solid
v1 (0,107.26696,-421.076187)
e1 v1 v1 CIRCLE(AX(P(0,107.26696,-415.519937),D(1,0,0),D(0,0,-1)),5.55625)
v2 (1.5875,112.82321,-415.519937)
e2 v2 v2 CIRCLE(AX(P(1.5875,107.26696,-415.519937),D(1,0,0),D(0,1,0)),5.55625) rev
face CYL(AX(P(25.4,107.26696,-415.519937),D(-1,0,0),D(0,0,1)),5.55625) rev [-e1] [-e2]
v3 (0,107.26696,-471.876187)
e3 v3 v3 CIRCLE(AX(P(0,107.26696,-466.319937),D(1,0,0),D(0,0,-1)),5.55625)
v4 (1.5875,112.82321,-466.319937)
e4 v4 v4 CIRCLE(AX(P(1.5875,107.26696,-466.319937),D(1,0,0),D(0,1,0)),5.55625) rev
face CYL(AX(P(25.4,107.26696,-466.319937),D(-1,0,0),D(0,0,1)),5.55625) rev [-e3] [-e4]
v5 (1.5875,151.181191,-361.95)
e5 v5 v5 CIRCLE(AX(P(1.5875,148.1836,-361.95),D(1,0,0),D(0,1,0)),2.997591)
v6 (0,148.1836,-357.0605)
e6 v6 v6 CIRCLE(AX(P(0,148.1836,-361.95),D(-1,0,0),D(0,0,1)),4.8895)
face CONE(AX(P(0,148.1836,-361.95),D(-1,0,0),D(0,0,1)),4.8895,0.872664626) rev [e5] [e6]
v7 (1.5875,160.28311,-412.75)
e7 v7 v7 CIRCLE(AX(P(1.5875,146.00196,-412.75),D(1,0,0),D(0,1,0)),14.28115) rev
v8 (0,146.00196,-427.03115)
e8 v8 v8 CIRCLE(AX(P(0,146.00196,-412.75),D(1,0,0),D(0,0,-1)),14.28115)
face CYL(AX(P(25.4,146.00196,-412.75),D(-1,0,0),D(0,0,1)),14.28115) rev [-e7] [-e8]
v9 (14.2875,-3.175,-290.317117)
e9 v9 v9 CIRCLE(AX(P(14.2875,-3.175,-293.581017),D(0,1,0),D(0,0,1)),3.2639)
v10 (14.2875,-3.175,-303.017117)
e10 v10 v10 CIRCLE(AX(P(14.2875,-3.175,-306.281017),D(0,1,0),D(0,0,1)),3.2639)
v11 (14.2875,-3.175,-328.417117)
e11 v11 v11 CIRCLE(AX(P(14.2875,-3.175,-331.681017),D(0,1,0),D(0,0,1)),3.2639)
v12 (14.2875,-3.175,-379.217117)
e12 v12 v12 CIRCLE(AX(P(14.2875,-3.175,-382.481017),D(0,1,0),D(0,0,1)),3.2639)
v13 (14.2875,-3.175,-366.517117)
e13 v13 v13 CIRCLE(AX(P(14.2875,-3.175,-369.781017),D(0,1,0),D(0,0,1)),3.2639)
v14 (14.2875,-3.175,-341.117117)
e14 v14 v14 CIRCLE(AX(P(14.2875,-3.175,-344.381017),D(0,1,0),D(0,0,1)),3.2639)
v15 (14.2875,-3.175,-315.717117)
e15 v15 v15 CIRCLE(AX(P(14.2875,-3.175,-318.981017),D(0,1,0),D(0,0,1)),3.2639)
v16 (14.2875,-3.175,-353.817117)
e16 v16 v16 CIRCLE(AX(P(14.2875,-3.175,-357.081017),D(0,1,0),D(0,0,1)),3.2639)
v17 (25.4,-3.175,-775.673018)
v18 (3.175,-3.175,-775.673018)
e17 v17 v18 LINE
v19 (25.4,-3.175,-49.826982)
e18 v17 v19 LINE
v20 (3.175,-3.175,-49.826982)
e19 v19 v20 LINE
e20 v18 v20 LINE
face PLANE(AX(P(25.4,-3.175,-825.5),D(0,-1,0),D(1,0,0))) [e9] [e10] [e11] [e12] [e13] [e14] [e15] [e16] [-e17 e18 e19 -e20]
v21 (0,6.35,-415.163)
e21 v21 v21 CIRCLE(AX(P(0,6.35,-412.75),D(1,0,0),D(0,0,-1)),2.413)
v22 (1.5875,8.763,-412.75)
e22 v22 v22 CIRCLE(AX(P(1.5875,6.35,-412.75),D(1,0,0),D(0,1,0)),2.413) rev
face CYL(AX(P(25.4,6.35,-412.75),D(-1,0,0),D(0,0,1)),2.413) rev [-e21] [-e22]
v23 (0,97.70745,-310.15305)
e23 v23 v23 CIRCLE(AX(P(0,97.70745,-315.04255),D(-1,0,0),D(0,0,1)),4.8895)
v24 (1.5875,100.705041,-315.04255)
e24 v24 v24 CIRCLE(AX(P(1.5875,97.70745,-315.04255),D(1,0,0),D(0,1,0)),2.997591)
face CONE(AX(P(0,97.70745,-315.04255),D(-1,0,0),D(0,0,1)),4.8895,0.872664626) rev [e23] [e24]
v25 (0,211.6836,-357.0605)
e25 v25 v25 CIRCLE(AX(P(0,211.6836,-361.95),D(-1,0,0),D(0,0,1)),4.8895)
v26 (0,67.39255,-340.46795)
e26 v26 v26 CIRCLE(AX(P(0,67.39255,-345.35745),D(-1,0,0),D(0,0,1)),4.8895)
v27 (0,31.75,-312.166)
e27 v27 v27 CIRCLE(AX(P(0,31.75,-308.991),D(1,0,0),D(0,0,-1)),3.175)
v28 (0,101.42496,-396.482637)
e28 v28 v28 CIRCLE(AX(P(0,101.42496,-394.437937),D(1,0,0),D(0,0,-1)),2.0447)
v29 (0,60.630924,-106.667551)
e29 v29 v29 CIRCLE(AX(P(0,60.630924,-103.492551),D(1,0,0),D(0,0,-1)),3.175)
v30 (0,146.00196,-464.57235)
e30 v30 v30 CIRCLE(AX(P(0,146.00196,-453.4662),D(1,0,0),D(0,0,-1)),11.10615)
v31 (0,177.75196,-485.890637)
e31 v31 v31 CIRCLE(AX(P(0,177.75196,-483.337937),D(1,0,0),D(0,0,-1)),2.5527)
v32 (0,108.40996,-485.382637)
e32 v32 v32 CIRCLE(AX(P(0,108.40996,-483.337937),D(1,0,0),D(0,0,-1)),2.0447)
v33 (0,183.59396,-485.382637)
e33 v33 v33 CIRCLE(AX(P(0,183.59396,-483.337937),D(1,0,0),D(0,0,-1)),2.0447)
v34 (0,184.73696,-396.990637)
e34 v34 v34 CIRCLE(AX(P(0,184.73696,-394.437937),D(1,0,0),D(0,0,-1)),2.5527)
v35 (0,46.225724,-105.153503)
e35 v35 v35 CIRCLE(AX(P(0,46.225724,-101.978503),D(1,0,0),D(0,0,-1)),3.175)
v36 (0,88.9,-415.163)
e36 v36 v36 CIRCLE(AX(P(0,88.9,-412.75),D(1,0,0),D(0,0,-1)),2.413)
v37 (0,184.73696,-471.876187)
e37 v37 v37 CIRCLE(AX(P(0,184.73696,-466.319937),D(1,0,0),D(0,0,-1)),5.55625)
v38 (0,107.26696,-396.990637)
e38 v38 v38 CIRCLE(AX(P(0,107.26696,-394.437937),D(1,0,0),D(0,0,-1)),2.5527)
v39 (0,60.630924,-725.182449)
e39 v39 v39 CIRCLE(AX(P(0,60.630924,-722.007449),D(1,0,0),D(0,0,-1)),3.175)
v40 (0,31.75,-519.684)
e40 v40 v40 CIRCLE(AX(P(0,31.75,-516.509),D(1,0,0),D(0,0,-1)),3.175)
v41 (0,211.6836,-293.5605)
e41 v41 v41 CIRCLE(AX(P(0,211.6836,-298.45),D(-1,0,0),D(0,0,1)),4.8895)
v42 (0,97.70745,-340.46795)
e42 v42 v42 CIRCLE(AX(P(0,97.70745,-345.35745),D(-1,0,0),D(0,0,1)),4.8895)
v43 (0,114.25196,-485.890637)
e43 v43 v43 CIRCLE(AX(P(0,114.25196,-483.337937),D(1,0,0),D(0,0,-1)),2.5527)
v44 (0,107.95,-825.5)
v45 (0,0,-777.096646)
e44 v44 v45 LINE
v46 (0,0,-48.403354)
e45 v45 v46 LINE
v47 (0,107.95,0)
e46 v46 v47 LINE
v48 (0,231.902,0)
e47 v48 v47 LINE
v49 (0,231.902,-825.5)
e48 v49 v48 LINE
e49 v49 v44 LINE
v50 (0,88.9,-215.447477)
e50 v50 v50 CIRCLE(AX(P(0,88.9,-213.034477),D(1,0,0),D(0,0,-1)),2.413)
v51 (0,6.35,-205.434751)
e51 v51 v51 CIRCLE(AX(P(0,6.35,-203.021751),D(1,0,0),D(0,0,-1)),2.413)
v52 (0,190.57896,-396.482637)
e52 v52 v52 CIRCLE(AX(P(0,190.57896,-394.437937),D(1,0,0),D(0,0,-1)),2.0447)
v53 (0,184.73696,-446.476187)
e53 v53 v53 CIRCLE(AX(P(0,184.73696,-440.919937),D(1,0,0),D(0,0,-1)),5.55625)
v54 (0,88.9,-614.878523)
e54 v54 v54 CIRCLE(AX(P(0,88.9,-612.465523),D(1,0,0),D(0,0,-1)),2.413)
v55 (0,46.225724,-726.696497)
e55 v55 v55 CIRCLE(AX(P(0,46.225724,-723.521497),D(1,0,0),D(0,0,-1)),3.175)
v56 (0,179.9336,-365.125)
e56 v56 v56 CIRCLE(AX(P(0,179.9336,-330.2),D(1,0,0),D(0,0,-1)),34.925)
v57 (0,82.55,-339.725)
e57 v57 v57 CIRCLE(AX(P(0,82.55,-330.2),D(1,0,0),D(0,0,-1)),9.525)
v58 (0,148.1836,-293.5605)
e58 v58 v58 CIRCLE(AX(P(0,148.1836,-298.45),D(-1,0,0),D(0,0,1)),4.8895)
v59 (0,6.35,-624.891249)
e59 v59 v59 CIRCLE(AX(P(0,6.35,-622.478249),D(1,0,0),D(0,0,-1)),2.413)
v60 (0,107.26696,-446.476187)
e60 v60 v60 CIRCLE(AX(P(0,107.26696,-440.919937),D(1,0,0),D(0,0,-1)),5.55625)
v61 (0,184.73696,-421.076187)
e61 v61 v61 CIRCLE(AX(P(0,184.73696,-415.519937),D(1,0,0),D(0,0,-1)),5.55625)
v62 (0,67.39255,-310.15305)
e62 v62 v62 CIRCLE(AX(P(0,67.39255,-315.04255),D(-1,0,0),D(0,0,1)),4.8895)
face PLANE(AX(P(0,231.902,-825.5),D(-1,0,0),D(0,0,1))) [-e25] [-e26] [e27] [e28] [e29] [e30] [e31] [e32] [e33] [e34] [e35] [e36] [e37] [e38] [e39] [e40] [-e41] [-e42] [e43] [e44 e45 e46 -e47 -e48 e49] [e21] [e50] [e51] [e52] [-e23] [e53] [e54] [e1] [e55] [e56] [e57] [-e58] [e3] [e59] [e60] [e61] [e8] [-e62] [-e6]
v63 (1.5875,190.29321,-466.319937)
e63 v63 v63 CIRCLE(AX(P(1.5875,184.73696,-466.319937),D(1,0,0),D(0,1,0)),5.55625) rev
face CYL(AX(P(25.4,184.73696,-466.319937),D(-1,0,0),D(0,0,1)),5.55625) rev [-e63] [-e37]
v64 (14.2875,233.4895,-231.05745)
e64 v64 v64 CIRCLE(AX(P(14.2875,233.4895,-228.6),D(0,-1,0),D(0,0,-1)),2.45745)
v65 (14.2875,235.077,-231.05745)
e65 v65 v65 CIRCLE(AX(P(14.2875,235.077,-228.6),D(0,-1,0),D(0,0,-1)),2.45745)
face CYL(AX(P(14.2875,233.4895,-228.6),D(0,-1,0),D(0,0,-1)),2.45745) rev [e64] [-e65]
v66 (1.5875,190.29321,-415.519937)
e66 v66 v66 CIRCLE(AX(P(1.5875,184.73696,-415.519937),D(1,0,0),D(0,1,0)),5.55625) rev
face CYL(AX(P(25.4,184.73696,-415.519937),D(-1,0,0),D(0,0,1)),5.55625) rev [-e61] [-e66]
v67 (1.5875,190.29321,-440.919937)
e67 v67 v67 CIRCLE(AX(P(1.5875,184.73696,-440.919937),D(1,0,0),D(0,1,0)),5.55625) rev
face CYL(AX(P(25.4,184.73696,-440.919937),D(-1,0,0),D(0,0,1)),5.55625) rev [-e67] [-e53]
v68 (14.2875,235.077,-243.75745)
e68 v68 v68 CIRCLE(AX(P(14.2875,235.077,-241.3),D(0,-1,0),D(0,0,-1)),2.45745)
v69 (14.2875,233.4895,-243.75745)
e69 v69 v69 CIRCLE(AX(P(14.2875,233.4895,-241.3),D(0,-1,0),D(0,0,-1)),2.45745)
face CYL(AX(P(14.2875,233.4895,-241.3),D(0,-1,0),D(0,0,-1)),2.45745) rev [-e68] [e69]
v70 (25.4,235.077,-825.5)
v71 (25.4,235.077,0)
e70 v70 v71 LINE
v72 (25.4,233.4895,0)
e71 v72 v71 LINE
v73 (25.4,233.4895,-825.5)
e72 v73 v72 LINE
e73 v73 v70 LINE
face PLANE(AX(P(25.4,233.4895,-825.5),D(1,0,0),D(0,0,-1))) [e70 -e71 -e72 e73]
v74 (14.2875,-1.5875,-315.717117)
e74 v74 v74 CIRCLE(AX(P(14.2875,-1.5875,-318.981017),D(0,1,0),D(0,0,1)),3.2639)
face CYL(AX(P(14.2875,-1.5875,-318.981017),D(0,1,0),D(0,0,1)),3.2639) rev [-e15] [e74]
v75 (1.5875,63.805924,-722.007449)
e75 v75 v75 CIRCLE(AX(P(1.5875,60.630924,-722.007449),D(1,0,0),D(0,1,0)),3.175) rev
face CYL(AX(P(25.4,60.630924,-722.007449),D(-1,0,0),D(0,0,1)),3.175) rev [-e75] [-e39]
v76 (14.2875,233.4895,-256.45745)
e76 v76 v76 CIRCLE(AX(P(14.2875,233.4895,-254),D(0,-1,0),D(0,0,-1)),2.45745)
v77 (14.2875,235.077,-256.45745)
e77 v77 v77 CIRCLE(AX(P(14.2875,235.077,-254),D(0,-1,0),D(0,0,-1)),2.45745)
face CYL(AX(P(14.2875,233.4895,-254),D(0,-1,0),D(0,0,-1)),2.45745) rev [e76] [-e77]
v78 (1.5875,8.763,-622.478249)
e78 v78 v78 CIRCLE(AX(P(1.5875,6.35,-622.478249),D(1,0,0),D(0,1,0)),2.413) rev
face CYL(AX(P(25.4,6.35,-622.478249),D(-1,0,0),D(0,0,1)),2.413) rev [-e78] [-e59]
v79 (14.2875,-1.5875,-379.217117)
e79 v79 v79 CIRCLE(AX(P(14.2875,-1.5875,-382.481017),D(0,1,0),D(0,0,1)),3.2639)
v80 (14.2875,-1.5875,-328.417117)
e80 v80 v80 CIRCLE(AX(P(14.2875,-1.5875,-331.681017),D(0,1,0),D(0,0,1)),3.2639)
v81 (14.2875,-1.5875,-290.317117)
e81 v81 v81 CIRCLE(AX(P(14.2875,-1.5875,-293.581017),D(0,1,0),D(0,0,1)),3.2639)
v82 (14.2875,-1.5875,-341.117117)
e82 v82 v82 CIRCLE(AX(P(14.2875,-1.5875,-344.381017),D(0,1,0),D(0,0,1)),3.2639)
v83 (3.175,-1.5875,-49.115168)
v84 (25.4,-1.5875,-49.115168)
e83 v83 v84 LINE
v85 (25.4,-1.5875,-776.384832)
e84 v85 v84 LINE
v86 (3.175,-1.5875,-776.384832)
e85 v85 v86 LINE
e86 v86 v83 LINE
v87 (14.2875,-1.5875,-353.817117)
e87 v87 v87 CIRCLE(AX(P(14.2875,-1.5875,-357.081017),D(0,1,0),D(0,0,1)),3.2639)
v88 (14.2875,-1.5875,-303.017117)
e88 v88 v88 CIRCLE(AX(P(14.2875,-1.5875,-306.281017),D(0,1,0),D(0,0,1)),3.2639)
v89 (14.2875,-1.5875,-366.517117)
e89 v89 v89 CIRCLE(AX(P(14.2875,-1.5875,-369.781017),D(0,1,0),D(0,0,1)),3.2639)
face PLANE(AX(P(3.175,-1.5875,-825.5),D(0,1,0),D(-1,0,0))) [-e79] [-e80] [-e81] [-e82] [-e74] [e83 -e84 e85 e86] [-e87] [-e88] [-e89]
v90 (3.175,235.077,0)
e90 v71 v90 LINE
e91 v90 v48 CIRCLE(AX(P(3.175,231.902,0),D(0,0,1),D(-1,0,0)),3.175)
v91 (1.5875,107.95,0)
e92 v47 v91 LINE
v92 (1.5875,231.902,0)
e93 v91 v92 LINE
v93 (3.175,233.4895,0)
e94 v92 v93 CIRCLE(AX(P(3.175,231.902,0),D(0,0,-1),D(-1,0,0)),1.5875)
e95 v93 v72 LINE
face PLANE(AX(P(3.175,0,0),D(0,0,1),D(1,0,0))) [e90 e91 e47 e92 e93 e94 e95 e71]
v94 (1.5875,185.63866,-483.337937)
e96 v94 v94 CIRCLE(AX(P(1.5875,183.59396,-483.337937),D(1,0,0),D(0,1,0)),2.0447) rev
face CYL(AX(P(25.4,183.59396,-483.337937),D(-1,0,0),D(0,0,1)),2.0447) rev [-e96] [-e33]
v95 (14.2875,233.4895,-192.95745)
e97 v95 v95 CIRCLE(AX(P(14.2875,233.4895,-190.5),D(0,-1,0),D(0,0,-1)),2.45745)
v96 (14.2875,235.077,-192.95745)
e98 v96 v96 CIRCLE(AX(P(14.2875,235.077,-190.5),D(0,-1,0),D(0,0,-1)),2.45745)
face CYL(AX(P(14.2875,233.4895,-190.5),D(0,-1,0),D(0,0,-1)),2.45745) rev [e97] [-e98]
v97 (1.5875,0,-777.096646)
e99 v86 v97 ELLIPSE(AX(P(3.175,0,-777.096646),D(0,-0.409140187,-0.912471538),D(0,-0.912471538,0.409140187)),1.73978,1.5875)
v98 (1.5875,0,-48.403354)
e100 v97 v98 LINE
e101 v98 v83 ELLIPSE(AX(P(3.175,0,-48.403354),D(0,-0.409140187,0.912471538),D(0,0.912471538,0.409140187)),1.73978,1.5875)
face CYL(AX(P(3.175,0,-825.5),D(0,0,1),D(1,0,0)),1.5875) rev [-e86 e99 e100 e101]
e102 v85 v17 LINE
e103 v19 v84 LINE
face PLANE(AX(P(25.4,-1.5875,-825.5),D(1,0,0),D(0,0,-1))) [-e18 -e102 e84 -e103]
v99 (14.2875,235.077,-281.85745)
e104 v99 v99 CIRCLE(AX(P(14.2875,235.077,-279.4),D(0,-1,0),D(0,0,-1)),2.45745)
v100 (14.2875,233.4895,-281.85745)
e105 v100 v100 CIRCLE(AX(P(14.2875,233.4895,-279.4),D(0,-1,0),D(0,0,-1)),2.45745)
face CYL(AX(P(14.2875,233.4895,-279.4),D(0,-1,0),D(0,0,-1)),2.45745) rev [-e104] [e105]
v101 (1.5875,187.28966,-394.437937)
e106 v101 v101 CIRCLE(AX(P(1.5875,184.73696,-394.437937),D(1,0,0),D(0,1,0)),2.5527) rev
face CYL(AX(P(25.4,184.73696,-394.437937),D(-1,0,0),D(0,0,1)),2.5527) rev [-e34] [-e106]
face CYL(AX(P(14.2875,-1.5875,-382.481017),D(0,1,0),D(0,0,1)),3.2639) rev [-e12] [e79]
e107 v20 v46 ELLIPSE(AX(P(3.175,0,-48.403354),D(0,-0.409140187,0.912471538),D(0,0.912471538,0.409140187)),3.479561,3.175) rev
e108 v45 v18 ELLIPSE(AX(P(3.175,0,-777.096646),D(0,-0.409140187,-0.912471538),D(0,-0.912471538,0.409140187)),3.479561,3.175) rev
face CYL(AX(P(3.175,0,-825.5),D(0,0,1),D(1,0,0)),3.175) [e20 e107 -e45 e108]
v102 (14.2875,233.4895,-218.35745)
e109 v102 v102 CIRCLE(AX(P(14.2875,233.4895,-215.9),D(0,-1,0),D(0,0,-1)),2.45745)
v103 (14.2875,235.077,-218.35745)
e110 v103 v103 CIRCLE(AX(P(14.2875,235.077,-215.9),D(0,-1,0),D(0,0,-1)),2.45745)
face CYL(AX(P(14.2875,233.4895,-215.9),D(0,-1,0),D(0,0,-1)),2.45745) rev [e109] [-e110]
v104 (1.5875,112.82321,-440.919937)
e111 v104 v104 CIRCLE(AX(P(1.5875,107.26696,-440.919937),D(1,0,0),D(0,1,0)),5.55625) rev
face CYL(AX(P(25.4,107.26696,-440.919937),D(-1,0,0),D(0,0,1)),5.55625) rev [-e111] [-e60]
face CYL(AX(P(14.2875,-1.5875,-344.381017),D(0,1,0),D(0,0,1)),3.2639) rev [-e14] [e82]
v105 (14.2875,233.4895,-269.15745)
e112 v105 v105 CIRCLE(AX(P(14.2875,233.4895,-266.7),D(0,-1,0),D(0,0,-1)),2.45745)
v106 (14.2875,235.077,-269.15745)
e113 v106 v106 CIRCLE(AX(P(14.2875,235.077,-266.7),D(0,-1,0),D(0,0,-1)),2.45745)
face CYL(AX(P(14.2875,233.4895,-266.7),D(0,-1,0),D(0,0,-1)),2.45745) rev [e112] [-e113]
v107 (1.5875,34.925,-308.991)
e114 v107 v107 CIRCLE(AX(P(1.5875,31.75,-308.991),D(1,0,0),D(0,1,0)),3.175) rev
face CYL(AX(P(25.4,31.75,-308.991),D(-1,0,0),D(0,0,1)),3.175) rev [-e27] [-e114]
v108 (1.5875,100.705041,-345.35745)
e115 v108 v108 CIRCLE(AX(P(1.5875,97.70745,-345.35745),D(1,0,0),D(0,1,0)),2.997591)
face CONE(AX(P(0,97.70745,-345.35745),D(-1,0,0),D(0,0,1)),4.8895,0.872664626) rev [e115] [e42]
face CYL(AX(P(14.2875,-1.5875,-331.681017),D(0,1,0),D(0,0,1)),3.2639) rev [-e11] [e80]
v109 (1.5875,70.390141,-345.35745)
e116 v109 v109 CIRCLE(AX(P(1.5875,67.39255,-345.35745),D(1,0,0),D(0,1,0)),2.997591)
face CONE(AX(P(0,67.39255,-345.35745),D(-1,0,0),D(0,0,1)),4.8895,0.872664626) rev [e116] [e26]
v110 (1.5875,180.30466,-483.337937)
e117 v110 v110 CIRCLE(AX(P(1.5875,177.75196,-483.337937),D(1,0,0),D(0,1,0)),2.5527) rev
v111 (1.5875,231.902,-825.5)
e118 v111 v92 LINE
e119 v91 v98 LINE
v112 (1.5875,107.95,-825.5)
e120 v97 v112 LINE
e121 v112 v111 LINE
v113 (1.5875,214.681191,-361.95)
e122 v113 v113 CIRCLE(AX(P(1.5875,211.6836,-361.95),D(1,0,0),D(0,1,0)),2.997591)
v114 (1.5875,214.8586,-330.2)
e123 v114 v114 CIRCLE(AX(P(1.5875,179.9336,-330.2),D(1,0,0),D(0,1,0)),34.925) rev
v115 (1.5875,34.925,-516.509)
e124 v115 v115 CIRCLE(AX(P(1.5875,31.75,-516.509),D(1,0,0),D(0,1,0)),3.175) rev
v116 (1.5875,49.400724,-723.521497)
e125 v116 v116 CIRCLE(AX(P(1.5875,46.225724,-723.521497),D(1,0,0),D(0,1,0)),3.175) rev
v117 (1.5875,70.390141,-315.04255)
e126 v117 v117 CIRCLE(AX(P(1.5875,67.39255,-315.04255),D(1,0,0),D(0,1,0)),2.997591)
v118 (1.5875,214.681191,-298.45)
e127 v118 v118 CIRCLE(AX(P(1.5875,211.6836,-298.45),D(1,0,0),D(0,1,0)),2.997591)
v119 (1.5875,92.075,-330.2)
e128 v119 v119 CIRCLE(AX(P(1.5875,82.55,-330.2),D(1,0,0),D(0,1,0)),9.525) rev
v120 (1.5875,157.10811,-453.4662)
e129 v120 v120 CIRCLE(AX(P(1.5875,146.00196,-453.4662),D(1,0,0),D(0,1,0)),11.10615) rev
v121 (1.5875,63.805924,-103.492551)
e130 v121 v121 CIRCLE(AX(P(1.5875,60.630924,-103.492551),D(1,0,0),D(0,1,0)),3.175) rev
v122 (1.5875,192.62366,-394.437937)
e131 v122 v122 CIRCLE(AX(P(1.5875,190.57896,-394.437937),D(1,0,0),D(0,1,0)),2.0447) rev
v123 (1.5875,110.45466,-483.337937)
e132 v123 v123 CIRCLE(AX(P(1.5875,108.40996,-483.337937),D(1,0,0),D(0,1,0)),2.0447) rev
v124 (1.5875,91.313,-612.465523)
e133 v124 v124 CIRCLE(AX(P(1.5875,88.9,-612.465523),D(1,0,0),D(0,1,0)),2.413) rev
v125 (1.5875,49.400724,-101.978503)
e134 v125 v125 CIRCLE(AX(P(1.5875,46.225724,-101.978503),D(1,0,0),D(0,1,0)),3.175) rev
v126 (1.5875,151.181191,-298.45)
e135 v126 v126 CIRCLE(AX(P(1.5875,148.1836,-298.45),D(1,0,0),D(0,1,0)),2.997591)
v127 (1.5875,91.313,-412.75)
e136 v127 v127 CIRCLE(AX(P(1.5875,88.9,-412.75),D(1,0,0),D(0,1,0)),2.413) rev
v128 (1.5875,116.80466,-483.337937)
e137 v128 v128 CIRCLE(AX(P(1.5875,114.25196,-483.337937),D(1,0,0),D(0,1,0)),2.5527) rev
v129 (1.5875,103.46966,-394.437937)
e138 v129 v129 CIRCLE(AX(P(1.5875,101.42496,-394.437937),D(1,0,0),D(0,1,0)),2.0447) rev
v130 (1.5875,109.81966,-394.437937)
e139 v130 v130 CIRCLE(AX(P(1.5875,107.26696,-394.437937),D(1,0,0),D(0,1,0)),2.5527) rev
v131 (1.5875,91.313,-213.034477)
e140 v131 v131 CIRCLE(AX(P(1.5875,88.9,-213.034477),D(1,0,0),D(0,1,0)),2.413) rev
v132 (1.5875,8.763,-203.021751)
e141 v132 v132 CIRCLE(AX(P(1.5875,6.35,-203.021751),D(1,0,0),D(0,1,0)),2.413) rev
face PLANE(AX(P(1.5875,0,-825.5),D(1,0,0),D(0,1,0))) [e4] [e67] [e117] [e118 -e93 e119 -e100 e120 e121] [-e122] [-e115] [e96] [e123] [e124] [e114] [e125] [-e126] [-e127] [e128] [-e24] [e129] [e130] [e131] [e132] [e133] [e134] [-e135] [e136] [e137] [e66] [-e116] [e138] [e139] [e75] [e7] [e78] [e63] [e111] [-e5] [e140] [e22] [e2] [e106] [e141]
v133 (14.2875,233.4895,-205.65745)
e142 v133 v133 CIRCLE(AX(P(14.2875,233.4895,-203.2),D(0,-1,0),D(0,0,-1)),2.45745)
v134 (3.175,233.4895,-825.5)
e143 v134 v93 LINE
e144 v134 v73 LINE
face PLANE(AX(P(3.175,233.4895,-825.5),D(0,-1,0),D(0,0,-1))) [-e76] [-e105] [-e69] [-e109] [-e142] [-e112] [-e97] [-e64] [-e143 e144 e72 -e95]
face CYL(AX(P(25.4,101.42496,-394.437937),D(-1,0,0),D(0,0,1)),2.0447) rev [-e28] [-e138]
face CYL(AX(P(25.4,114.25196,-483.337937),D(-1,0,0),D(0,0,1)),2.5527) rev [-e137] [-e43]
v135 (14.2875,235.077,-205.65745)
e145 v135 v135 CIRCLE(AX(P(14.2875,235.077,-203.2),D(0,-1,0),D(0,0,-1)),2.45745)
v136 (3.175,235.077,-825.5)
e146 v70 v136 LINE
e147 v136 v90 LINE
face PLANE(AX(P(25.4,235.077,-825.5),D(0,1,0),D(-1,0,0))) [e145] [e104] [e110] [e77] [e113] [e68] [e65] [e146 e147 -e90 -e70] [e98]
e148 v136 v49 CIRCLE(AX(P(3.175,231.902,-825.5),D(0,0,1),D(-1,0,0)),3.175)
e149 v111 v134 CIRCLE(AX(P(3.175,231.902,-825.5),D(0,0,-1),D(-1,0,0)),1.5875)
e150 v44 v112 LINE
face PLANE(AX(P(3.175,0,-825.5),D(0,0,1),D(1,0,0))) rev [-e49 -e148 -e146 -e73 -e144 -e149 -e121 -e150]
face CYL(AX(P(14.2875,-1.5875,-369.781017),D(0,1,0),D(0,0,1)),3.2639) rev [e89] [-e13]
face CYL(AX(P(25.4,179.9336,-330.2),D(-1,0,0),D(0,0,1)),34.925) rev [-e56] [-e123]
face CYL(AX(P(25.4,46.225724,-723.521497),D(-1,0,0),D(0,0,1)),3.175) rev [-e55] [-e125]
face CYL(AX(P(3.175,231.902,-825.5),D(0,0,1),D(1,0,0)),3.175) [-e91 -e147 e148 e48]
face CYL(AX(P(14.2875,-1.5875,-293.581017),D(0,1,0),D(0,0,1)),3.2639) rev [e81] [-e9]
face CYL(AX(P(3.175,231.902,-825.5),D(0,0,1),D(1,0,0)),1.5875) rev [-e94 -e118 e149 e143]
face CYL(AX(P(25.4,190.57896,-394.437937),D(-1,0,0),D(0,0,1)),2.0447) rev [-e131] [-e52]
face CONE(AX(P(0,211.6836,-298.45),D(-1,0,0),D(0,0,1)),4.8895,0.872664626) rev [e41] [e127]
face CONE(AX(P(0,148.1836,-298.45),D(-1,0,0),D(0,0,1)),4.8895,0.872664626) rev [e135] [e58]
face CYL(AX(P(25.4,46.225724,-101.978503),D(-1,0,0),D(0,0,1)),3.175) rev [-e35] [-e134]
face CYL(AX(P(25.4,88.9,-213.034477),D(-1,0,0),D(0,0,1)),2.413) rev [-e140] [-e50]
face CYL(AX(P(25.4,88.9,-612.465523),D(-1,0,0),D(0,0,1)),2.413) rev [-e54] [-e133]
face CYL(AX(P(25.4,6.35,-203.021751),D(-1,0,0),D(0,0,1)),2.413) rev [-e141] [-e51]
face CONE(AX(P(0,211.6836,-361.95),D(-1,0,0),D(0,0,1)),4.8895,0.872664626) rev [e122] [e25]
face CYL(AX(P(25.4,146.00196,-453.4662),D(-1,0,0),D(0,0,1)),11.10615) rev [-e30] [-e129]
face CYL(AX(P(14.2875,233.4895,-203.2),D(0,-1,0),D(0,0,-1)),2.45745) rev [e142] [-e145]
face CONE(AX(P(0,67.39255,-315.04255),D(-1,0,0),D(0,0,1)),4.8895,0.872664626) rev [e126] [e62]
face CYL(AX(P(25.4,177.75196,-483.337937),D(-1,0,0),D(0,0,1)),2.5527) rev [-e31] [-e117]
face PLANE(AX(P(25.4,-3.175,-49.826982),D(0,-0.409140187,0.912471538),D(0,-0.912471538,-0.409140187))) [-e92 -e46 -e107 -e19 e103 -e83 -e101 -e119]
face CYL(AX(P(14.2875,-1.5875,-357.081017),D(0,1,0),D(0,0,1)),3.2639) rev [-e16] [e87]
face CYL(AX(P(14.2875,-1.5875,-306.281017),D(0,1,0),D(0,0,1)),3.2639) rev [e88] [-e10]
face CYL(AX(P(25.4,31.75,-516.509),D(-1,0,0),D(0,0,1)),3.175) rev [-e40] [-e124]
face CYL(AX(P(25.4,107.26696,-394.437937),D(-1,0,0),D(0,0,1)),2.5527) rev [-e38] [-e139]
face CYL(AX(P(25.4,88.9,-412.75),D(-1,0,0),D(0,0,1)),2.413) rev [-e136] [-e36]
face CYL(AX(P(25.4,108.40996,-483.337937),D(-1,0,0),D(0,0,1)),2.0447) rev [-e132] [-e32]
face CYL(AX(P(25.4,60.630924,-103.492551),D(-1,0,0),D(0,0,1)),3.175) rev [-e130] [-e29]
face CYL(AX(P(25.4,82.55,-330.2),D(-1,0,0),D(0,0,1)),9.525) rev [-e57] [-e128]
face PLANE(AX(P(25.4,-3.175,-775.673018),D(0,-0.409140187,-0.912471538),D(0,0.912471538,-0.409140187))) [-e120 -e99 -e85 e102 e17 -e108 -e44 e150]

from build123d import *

# Parameters (mm, degrees)
BASE_FLANGE2_DEPTH                                 = 825.5
SKETCH1_R                                          = 3.175
SKETCH1_R_2                                        = 2.413
SKETCH1_R_3                                        = 5.55625
SKETCH1_R_4                                        = 2.5527
SKETCH1_R_5                                        = 2.0447
SKETCH1_R_6                                        = 14.28115
SKETCH1_R_7                                        = 11.10615
SKETCH1_R_8                                        = 1.5875
SKETCH1_R_9                                        = 9.525
SKETCH1_R_10                                       = 1.27
SKETCH1_R_11                                       = 34.925
CUT_EXTRUDE3_DEPTH                                 = 859.694710551
CSK_FOR_10_FLAT_HEAD_MACHINE_SCREW_100_D           = 4.9784
CSK_FOR_10_FLAT_HEAD_MACHINE_SCREW_100_CSINK_D     = 9.779
CSK_FOR_10_FLAT_HEAD_MACHINE_SCREW_100_CSINK_ANGLE = 100
SKETCH8_R                                          = 0.635
CUT_EXTRUDE4_DEPTH                                 = 860.130662682
F_1_4_CLEARANCE_HOLE1_D                            = 6.5278
F_1_4_CLEARANCE_HOLE1_DEPTH                        = 1.5875
F_8_CLEARANCE_HOLE1_D                              = 4.9149
F_8_CLEARANCE_HOLE1_DEPTH                          = 1.5875


# Sheet-metal steps are written as plain solids
with BuildPart() as part:
    # Sketch3 → Base-Flange2 (new body)
    with BuildSketch(Plane.XY):
        with BuildLine():
            Line((3.175, 233.4895), (25.4, 233.4895))
            Line((25.4, 233.4895), (25.4, 235.077))
            Line((25.4, 235.077), (3.175, 235.077))
            ThreePointArc((3.175, 235.077), (0.92993597, 234.14706403), (0, 231.902))
            Line((0, 231.902), (0, 0))
            ThreePointArc((0, 0), (0.92993597, -2.24506403), (3.175, -3.175))
            Line((3.175, -3.175), (25.4, -3.175))
            Line((25.4, -3.175), (25.4, -1.5875))
            Line((25.4, -1.5875), (3.175, -1.5875))
            ThreePointArc((3.175, -1.5875), (2.052467985, -1.122532015), (1.5875, 0))
            Line((1.5875, 0), (1.5875, 231.902))
            ThreePointArc((1.5875, 231.902), (2.052467985, 233.024532015), (3.175, 233.4895))
        make_face()
    extrude(amount=-BASE_FLANGE2_DEPTH)

    # Sketch1 → Cut-Extrude3 (cut, through all)
    with BuildSketch(Plane(origin=(0, 0, 0), x_dir=(0, 0, -1), z_dir=(1, 0, 0))):
        with Locations(Location((516.509, 31.75, 0), (0, 0, 90))):
            Circle(SKETCH1_R)
        with Locations(Location((308.991, 31.75, 0), (0, 0, 90))):
            Circle(SKETCH1_R)
        with Locations(Location((103.492550911, 60.630923565, 0), (0, 0, 90))):
            Circle(SKETCH1_R)
        with Locations(Location((722.007449089, 60.630923565, 0), (0, 0, 90))):
            Circle(SKETCH1_R)
        with Locations(Location((412.75, 6.35, 0), (0, 0, 90))):
            Circle(SKETCH1_R_2)
        with Locations(Location((412.75, 88.9, 0), (0, 0, 90))):
            Circle(SKETCH1_R_2)
        with Locations(Location((622.478249316, 6.35, 0), (0, 0, 90))):
            Circle(SKETCH1_R_2)
        with Locations(Location((612.465522577, 88.9, 0), (0, 0, 90))):
            Circle(SKETCH1_R_2)
        with Locations(Location((203.021750684, 6.35, 0), (0, 0, 90))):
            Circle(SKETCH1_R_2)
        with Locations(Location((101.978503418, 46.225723918, 0), (0, 0, 90))):
            Circle(SKETCH1_R)
        with Locations(Location((723.521496582, 46.225723918, 0), (0, 0, 90))):
            Circle(SKETCH1_R)
        with Locations(Location((213.034477423, 88.9, 0), (0, 0, 90))):
            Circle(SKETCH1_R_2)
        with Locations(Location((466.319936913, 184.736959746, 0), (0, 0, 90))):
            Circle(SKETCH1_R_3)
        with Locations(Location((483.337936913, 177.751959746, 0), (0, 0, 90))):
            Circle(SKETCH1_R_4)
        with Locations(Location((483.337936913, 183.593959746, 0), (0, 0, 90))):
            Circle(SKETCH1_R_5)
        with Locations(Location((483.337936913, 114.251959746, 0), (0, 0, 90))):
            Circle(SKETCH1_R_4)
        with Locations(Location((483.337936913, 108.409959746, 0), (0, 0, 90))):
            Circle(SKETCH1_R_5)
        with Locations(Location((466.319936913, 107.266959746, 0), (0, 0, 90))):
            Circle(SKETCH1_R_3)
        with Locations(Location((440.919936913, 107.266959746, 0), (0, 0, 90))):
            Circle(SKETCH1_R_3)
        with Locations(Location((415.519936913, 107.266959746, 0), (0, 0, 90))):
            Circle(SKETCH1_R_3)
        with Locations(Location((394.437936913, 107.266959746, 0), (0, 0, 90))):
            Circle(SKETCH1_R_4)
        with Locations(Location((394.437936913, 101.424959746, 0), (0, 0, 90))):
            Circle(SKETCH1_R_5)
        with Locations(Location((394.437936913, 184.736959746, 0), (0, 0, 90))):
            Circle(SKETCH1_R_4)
        with Locations(Location((394.437936913, 190.578959746, 0), (0, 0, 90))):
            Circle(SKETCH1_R_5)
        with Locations(Location((412.75, 146.001959746, 0), (0, 0, 90))):
            Circle(SKETCH1_R_6)
        with Locations(Location((453.4662, 146.001959746, 0), (0, 0, 90))):
            Circle(SKETCH1_R_7)
        with Locations(Location((440.919936913, 184.736959746, 0), (0, 0, 90))):
            Circle(SKETCH1_R_3)
        with Locations(Location((415.519936913, 184.736959746, 0), (0, 0, 90))):
            Circle(SKETCH1_R_3)
        with Locations(Location((345.35745, 97.70745, 0), (0, 0, 90))):
            Circle(SKETCH1_R_8)
        with Locations(Location((315.04255, 97.70745, 0), (0, 0, 90))):
            Circle(SKETCH1_R_8)
        with Locations(Location((315.04255, 67.39255, 0), (0, 0, 90))):
            Circle(SKETCH1_R_8)
        with Locations(Location((345.35745, 67.39255, 0), (0, 0, 90))):
            Circle(SKETCH1_R_8)
        with Locations(Location((330.2, 82.55, 0), (0, 0, 90))):
            Circle(SKETCH1_R_9)
        with Locations(Location((361.95, 211.6836, 0), (0, 0, 90))):
            Circle(SKETCH1_R_10)
        with Locations(Location((298.45, 211.6836, 0), (0, 0, 90))):
            Circle(SKETCH1_R_10)
        with Locations(Location((298.45, 148.1836, 0), (0, 0, 90))):
            Circle(SKETCH1_R_10)
        with Locations(Location((361.95, 148.1836, 0), (0, 0, 90))):
            Circle(SKETCH1_R_10)
        with Locations(Location((330.2, 179.9336, 0), (0, 0, 90))):
            Circle(SKETCH1_R_11)
        Polygon((825.5, -3.175), (775.673017562, -3.175), (825.5, 107.95), align=None)
        Polygon((0, 107.95), (0, -3.175), (49.826982438, -3.175), align=None)
    extrude(amount=CUT_EXTRUDE3_DEPTH, mode=Mode.SUBTRACT)

    # CSK for #10 Flat Head Machine Screw (100)1 (through all)
    with Locations(Plane.ZY):
        with Locations((-345.35745, 97.70745), (-315.04255, 97.70745), (-315.04255, 67.39255), (-345.35745, 67.39255), (-298.45, 148.1836), (-361.95, 148.1836), (-361.95, 211.6836), (-298.45, 211.6836)):
            CounterSinkHole(CSK_FOR_10_FLAT_HEAD_MACHINE_SCREW_100_D / 2, CSK_FOR_10_FLAT_HEAD_MACHINE_SCREW_100_CSINK_D / 2, counter_sink_angle=CSK_FOR_10_FLAT_HEAD_MACHINE_SCREW_100_CSINK_ANGLE)

    # Sketch8 → Cut-Extrude4 (cut, through all)
    with BuildSketch(Plane(origin=(0, -1.5875, 0), x_dir=(1, 0, 0), z_dir=(0, 1, 0))):
        with Locations(Location((14.2875, 382.481016783, 0), (0, 0, 180))):
            Circle(SKETCH8_R)
        with Locations(Location((14.2875, 369.781016783, 0), (0, 0, 180))):
            Circle(SKETCH8_R)
        with Locations(Location((14.2875, 357.081016783, 0), (0, 0, 180))):
            Circle(SKETCH8_R)
        with Locations(Location((14.2875, 344.381016783, 0), (0, 0, 180))):
            Circle(SKETCH8_R)
        with Locations(Location((14.2875, 331.681016783, 0), (0, 0, 180))):
            Circle(SKETCH8_R)
        with Locations(Location((14.2875, 318.981016783, 0), (0, 0, 180))):
            Circle(SKETCH8_R)
        with Locations(Location((14.2875, 306.281016783, 0), (0, 0, 180))):
            Circle(SKETCH8_R)
        with Locations(Location((14.2875, 293.581016783, 0), (0, 0, 180))):
            Circle(SKETCH8_R)
    extrude(amount=-CUT_EXTRUDE4_DEPTH, mode=Mode.SUBTRACT)

    # 1/4 Clearance Hole1
    with Locations(Plane(origin=(0, -1.5875, 0), x_dir=(1, 0, 0), z_dir=(0, 1, 0))):
        with Locations((14.2875, 382.481016783), (14.2875, 369.781016783), (14.2875, 357.081016783), (14.2875, 344.381016783), (14.2875, 331.681016783), (14.2875, 318.981016783), (14.2875, 306.281016783), (14.2875, 293.581016783)):
            Hole(F_1_4_CLEARANCE_HOLE1_D / 2, depth=F_1_4_CLEARANCE_HOLE1_DEPTH)

    # #8 Clearance Hole1
    with Locations(Plane(origin=(0, 233.4895, 0), x_dir=(-1, 0, 0), z_dir=(0, -1, 0))):
        with Locations((-14.2875, 279.4), (-14.2875, 266.7), (-14.2875, 254), (-14.2875, 241.3), (-14.2875, 228.6), (-14.2875, 215.9), (-14.2875, 203.2), (-14.2875, 190.5)):
            Hole(F_8_CLEARANCE_HOLE1_D / 2, depth=F_8_CLEARANCE_HOLE1_DEPTH)


solid = part.part
